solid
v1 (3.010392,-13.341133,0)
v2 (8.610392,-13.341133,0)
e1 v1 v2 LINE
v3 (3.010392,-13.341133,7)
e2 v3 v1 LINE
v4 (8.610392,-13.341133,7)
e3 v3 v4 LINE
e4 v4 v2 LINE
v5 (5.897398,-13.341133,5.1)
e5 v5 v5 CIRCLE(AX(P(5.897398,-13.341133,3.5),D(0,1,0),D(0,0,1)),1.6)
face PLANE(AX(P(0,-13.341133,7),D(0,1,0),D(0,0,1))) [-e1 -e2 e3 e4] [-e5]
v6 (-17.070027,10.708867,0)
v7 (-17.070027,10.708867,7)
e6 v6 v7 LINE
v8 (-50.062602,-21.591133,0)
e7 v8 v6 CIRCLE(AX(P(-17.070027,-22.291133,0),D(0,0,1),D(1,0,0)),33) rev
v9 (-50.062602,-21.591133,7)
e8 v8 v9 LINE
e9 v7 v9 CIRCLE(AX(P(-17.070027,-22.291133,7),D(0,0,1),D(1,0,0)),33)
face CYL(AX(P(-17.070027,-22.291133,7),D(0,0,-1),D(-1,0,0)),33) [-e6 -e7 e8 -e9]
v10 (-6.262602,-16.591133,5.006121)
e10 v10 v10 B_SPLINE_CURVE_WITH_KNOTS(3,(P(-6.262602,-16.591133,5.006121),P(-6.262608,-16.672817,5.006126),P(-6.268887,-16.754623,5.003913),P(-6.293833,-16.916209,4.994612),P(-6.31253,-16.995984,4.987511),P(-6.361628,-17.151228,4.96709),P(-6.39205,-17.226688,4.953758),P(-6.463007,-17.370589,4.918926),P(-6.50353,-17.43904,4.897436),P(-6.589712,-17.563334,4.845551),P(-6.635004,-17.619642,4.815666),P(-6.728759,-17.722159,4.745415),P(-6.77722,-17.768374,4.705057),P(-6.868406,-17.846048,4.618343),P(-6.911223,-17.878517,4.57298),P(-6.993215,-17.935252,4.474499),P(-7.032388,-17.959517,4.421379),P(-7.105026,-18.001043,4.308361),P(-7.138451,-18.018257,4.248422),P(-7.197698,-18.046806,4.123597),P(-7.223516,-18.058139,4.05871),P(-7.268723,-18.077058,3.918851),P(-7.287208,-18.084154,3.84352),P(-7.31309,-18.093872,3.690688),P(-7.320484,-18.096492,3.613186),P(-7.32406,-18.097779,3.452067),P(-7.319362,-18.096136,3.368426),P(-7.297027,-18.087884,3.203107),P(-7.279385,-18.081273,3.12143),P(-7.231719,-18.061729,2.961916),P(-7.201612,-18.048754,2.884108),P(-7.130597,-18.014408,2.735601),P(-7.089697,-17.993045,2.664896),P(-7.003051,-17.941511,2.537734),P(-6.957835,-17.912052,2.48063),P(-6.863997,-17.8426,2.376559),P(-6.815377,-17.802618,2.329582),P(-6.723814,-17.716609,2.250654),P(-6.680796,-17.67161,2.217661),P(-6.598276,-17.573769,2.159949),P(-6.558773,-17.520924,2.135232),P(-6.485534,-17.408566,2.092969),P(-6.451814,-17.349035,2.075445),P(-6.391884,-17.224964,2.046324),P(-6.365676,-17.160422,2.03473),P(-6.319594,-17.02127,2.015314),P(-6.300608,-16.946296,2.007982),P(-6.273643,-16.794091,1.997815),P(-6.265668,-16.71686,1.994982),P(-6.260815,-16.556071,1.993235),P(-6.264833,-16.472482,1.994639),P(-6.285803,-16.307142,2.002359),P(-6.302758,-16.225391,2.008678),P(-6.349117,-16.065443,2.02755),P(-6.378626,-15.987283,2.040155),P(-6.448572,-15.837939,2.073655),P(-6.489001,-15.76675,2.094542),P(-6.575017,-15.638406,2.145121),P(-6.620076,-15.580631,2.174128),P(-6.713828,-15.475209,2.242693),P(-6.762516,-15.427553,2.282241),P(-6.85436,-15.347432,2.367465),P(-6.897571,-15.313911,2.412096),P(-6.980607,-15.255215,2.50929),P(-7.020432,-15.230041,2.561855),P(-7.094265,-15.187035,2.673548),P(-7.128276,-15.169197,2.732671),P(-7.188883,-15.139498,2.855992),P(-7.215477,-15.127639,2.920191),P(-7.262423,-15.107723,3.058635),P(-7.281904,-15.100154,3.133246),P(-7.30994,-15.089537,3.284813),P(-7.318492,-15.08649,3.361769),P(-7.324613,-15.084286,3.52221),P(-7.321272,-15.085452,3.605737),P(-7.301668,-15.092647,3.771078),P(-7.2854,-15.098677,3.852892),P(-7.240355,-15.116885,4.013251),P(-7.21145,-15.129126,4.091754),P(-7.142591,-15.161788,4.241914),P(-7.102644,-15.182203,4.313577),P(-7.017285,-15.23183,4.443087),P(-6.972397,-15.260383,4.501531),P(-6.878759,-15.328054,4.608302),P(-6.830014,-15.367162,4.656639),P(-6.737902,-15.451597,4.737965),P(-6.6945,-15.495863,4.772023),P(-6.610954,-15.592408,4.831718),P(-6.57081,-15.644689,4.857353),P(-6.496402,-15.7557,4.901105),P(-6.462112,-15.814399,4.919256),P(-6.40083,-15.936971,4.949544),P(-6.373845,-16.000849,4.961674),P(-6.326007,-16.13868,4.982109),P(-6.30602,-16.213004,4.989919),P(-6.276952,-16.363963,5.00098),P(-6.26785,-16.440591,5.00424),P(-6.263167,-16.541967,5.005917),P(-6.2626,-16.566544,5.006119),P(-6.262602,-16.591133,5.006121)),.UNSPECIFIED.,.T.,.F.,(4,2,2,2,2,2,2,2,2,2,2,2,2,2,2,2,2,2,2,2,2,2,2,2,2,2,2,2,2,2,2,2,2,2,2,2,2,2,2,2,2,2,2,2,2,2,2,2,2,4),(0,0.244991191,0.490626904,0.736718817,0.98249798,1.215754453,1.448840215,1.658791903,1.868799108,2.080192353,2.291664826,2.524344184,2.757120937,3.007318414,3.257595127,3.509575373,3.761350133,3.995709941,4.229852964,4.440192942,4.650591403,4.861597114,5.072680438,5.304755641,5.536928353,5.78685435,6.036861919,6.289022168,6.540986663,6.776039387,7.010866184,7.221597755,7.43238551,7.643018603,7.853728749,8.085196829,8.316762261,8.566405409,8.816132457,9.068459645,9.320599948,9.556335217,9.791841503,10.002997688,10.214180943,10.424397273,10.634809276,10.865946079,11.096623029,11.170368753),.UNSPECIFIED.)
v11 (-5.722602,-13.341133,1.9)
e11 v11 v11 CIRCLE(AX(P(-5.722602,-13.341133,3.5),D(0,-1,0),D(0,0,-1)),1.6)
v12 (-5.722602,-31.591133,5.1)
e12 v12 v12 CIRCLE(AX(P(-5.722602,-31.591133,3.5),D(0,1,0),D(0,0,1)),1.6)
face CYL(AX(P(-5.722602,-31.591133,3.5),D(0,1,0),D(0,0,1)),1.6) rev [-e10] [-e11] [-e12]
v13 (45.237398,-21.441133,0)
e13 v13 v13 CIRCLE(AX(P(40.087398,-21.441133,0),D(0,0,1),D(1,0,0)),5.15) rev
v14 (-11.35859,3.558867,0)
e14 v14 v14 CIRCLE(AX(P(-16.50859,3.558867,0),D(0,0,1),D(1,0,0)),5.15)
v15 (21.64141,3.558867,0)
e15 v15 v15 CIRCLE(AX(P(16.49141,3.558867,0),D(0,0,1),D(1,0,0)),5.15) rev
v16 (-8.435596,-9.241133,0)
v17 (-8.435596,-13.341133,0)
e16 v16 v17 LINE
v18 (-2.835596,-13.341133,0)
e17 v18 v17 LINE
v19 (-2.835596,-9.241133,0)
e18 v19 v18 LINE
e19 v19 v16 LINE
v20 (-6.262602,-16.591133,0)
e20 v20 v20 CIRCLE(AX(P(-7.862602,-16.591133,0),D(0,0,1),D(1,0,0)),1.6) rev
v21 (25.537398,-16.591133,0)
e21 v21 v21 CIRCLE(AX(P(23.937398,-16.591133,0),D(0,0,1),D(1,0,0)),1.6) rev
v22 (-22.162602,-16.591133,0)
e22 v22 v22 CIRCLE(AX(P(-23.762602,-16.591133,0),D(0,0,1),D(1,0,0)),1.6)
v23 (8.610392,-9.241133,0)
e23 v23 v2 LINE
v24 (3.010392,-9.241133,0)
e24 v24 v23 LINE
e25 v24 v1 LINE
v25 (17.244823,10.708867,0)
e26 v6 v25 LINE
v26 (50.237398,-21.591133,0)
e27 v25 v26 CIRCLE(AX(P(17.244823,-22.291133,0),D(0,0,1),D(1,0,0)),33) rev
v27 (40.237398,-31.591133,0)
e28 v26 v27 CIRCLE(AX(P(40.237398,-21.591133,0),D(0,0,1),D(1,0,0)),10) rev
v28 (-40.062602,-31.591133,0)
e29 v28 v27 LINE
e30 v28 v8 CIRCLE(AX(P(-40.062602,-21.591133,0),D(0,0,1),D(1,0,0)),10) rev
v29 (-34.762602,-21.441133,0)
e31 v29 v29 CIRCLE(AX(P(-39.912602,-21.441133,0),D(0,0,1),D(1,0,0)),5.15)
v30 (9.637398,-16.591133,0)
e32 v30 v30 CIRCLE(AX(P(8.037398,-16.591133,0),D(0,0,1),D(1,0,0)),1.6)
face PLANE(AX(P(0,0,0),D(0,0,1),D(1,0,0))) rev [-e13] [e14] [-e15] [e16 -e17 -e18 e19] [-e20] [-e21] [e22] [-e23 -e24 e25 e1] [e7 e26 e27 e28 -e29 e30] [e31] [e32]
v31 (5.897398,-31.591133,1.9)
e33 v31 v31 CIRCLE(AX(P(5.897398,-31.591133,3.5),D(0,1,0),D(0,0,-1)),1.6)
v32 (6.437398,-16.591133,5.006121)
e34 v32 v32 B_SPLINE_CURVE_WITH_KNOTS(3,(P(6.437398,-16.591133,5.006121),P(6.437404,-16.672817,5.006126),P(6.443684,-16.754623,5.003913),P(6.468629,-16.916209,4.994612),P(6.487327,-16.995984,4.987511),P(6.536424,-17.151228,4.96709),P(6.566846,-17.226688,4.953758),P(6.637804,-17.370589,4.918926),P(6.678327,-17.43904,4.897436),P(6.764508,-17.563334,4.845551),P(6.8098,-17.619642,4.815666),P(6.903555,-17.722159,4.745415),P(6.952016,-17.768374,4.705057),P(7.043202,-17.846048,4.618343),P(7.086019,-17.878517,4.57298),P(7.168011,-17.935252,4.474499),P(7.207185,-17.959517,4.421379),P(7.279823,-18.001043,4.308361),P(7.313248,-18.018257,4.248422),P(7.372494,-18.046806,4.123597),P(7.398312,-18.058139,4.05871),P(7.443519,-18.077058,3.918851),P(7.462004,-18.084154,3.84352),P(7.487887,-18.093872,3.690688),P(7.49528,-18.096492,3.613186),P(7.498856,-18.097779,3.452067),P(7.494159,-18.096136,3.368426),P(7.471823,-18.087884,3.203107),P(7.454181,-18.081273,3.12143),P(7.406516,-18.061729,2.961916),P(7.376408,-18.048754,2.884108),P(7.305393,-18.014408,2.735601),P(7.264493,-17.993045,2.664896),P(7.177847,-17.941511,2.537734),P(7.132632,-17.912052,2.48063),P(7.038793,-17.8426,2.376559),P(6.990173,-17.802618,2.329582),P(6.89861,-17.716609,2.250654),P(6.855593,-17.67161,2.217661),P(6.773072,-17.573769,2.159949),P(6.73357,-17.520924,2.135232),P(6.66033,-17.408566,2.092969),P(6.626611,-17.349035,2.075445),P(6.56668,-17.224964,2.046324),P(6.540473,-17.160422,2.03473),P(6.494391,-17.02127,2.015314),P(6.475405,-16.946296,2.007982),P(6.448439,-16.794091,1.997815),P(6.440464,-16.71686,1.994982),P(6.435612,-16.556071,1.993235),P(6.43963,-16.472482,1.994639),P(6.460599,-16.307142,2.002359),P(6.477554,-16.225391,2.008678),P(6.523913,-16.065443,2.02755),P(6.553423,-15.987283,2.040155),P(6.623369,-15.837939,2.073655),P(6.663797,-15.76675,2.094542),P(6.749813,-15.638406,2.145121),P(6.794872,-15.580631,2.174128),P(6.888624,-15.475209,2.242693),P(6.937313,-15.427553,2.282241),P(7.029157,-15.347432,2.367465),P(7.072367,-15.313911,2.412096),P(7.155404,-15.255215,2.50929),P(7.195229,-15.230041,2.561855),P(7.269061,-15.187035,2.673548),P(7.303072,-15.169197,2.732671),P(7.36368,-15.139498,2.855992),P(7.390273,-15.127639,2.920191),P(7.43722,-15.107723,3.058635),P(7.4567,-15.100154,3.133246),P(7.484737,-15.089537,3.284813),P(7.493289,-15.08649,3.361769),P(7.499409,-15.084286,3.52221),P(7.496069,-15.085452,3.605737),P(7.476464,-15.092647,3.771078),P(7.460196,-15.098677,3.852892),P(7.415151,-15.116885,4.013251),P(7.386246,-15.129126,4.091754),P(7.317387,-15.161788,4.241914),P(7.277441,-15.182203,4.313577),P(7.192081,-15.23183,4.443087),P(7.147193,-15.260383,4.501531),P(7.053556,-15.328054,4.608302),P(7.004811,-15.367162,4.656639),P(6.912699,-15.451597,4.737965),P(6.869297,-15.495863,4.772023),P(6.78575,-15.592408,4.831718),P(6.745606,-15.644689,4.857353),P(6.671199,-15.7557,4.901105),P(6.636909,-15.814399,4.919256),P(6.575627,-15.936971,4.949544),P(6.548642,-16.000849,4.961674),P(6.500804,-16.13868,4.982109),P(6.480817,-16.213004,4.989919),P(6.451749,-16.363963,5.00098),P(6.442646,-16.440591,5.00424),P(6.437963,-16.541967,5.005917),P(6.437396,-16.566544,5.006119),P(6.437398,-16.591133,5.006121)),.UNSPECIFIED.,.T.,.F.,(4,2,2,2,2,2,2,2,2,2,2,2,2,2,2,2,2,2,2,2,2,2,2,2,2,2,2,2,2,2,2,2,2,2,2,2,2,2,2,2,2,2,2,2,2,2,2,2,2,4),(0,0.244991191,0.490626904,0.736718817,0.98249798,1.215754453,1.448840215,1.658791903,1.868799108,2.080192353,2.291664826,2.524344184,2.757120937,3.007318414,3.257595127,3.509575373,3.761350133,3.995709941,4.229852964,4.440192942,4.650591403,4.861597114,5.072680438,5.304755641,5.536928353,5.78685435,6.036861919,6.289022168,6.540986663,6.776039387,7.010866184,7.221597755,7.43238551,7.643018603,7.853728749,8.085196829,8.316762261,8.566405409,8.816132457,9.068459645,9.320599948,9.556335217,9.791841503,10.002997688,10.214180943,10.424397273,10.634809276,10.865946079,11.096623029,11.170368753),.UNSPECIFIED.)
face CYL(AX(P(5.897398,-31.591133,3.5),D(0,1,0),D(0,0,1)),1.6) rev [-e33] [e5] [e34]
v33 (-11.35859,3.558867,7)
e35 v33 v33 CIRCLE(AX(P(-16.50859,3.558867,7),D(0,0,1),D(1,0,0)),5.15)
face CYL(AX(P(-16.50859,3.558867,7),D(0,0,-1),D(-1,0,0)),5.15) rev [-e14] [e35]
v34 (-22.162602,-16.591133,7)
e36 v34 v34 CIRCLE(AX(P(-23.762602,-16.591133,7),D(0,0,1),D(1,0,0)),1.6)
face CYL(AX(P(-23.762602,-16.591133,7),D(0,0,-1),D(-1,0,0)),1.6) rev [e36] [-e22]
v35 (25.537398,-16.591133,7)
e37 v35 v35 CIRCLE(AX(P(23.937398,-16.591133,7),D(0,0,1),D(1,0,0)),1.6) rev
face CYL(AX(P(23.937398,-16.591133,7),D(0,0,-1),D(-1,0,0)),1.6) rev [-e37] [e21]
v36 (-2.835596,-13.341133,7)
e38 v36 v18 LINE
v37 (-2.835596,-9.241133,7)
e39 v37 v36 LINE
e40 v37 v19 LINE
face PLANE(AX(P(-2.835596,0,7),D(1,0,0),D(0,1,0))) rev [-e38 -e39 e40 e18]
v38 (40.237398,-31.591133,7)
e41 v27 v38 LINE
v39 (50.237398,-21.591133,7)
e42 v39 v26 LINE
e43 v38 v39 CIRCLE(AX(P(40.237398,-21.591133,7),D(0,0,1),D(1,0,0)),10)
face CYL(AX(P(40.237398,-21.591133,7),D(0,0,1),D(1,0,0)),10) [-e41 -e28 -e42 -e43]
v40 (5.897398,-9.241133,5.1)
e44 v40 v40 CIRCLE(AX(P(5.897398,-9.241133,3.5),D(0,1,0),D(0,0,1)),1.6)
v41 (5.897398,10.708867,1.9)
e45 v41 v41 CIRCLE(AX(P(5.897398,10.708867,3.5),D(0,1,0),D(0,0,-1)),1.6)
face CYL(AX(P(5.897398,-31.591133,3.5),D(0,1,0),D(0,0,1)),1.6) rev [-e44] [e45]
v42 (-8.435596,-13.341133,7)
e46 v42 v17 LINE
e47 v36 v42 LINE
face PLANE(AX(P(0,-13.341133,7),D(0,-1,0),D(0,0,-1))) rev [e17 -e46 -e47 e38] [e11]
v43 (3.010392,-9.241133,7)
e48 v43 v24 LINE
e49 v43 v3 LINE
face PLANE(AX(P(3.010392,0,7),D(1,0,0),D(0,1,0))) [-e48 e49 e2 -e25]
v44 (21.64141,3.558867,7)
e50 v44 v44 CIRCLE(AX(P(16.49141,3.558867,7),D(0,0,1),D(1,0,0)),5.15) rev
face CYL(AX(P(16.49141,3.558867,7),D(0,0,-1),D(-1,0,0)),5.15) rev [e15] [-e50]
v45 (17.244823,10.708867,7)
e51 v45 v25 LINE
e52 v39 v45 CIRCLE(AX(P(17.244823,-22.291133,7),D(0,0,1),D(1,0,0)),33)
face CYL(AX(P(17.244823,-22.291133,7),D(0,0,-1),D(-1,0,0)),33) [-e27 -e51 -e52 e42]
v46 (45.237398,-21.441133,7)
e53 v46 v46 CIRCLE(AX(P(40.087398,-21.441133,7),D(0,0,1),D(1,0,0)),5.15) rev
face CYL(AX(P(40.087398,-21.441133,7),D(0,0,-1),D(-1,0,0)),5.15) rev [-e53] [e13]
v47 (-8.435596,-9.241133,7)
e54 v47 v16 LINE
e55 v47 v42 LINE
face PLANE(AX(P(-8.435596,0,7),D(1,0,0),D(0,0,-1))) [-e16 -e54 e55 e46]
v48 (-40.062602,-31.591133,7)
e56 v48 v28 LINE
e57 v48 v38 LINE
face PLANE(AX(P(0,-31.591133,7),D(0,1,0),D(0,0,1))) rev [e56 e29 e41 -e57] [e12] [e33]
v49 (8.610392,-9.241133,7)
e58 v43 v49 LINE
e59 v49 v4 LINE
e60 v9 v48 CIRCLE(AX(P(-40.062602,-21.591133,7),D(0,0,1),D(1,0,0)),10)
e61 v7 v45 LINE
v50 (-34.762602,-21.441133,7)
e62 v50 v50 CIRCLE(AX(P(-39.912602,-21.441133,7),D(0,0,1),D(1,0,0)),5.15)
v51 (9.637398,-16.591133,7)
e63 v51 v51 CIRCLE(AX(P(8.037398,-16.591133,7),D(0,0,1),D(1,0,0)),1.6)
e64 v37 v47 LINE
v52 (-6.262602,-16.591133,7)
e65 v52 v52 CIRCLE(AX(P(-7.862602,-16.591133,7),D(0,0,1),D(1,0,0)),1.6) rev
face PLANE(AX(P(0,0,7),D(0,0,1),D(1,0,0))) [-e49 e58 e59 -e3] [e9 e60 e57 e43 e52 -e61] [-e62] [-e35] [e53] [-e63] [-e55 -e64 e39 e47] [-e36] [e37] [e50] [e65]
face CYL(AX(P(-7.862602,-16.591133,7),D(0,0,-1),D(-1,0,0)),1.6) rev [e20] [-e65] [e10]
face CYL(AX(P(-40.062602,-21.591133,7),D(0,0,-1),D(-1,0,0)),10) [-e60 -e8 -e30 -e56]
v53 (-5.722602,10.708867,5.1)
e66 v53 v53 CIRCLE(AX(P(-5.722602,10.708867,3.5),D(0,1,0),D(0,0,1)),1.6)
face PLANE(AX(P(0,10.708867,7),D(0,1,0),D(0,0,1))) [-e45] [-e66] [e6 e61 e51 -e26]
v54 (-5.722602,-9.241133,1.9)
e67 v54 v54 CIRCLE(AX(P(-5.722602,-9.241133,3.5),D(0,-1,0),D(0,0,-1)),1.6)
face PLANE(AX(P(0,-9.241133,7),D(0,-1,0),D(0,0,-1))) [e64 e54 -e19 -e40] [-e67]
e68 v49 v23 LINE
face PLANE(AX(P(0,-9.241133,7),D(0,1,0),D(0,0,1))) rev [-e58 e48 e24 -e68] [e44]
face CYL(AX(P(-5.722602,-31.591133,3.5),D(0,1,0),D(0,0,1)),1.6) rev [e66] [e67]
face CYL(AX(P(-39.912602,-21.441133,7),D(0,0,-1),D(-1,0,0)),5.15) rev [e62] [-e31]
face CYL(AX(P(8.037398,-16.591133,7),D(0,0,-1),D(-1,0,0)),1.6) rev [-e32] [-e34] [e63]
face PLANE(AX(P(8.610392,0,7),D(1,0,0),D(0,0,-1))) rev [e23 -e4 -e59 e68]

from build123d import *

# Parameters (mm, degrees)
ESBO_O1_W                = 100.3
ESBO_O1_H                = 42.3
ESBO_O1_R                = 5.15
ESBO_O1_R_2              = 1.6
ESBO_O1_W_2              = 5.6
ESBO_O1_H_2              = 4.1
RESSALTO_EXTRUS_O1_DEPTH = 7
FILETE1_R                = 10
ESBO_O4_R                = 1.6
CORTE_EXTRUS_O3_DEPTH    = 67.046091306
FILETE3_R                = 33


with BuildPart() as part:
    # Esboço1 → Ressalto-extrusão1 (new body)
    with BuildSketch(Plane.XY):
        with Locations((0.087398189, -10.441132561)):
            Rectangle(ESBO_O1_W, ESBO_O1_H)
        with Locations((-16.508590221, 3.558867439)):
            Circle(ESBO_O1_R, mode=Mode.SUBTRACT)
        with Locations((16.491409779, 3.558867439)):
            Circle(ESBO_O1_R, mode=Mode.SUBTRACT)
        with Locations((-39.912601811, -21.441132561)):
            Circle(ESBO_O1_R, mode=Mode.SUBTRACT)
        with Locations((40.087398189, -21.441132561)):
            Circle(ESBO_O1_R, mode=Mode.SUBTRACT)
        with Locations((8.037398189, -16.591132561)):
            Circle(ESBO_O1_R_2, mode=Mode.SUBTRACT)
        with Locations((23.937398189, -16.591132561)):
            Circle(ESBO_O1_R_2, mode=Mode.SUBTRACT)
        with Locations((-7.862601811, -16.591132561)):
            Circle(ESBO_O1_R_2, mode=Mode.SUBTRACT)
        with Locations((-23.762601811, -16.591132561)):
            Circle(ESBO_O1_R_2, mode=Mode.SUBTRACT)
        with Locations((-5.635596016, -11.291132561)):
            Rectangle(ESBO_O1_W_2, ESBO_O1_H_2, mode=Mode.SUBTRACT)
        with Locations((5.810392394, -11.291132561)):
            Rectangle(ESBO_O1_W_2, ESBO_O1_H_2, mode=Mode.SUBTRACT)
    extrude(amount=RESSALTO_EXTRUS_O1_DEPTH)

    # Filete1
    filete1_edges = [part.edges().sort_by_distance(p)[0] for p in [
        (50.237398189, -31.591132561, 3.5),
        (-50.062601811, -31.591132561, 3.5),
    ]]
    fillet(filete1_edges, radius=FILETE1_R)

    # Esboço4 → Corte-extrusão3 (cut, through all)
    with BuildSketch(Plane(origin=(0, 10.708867439, 0), x_dir=(1, 0, 0), z_dir=(0, 1, 0))):
        with Locations(Location((-5.722601811, -3.5, 0), (0, 0, 270))):
            Circle(ESBO_O4_R)
        with Locations(Location((5.897398189, -3.5, 0), (0, 0, 270))):
            Circle(ESBO_O4_R)
    extrude(amount=-CORTE_EXTRUS_O3_DEPTH, mode=Mode.SUBTRACT)

    # Filete3
    # the kernel refuses this fillet: 33 mm, written as the material it takes off along each edge
    with BuildSketch(Plane(origin=(50.237398189, 10.708867439, -82.481437306), x_dir=(0, -1, 0), z_dir=(0, 0, 1))) as filete3_piece_1:
        with BuildLine():
            CenterArc((33, -32.992574922), FILETE3_R, 91.215456182, 88.784543818)
            Line((0, -32.992574922), (0, 0))
            Line((0, 0), (32.3, 0))
        make_face()
    extrude(amount=171.962874611, mode=Mode.SUBTRACT)
    with BuildSketch(Plane(origin=(-50.062601811, 10.708867439, -82.481437306), x_dir=(0, -1, 0), z_dir=(0, 0, 1))) as filete3_piece_2:
        with BuildLine():
            CenterArc((33, 32.992574922), FILETE3_R, 180, 88.784543818)
            Line((0, 32.992574922), (0, 0))
            Line((0, 0), (32.3, 0))
        make_face()
    extrude(amount=171.962874611, mode=Mode.SUBTRACT)


solid = part.part
